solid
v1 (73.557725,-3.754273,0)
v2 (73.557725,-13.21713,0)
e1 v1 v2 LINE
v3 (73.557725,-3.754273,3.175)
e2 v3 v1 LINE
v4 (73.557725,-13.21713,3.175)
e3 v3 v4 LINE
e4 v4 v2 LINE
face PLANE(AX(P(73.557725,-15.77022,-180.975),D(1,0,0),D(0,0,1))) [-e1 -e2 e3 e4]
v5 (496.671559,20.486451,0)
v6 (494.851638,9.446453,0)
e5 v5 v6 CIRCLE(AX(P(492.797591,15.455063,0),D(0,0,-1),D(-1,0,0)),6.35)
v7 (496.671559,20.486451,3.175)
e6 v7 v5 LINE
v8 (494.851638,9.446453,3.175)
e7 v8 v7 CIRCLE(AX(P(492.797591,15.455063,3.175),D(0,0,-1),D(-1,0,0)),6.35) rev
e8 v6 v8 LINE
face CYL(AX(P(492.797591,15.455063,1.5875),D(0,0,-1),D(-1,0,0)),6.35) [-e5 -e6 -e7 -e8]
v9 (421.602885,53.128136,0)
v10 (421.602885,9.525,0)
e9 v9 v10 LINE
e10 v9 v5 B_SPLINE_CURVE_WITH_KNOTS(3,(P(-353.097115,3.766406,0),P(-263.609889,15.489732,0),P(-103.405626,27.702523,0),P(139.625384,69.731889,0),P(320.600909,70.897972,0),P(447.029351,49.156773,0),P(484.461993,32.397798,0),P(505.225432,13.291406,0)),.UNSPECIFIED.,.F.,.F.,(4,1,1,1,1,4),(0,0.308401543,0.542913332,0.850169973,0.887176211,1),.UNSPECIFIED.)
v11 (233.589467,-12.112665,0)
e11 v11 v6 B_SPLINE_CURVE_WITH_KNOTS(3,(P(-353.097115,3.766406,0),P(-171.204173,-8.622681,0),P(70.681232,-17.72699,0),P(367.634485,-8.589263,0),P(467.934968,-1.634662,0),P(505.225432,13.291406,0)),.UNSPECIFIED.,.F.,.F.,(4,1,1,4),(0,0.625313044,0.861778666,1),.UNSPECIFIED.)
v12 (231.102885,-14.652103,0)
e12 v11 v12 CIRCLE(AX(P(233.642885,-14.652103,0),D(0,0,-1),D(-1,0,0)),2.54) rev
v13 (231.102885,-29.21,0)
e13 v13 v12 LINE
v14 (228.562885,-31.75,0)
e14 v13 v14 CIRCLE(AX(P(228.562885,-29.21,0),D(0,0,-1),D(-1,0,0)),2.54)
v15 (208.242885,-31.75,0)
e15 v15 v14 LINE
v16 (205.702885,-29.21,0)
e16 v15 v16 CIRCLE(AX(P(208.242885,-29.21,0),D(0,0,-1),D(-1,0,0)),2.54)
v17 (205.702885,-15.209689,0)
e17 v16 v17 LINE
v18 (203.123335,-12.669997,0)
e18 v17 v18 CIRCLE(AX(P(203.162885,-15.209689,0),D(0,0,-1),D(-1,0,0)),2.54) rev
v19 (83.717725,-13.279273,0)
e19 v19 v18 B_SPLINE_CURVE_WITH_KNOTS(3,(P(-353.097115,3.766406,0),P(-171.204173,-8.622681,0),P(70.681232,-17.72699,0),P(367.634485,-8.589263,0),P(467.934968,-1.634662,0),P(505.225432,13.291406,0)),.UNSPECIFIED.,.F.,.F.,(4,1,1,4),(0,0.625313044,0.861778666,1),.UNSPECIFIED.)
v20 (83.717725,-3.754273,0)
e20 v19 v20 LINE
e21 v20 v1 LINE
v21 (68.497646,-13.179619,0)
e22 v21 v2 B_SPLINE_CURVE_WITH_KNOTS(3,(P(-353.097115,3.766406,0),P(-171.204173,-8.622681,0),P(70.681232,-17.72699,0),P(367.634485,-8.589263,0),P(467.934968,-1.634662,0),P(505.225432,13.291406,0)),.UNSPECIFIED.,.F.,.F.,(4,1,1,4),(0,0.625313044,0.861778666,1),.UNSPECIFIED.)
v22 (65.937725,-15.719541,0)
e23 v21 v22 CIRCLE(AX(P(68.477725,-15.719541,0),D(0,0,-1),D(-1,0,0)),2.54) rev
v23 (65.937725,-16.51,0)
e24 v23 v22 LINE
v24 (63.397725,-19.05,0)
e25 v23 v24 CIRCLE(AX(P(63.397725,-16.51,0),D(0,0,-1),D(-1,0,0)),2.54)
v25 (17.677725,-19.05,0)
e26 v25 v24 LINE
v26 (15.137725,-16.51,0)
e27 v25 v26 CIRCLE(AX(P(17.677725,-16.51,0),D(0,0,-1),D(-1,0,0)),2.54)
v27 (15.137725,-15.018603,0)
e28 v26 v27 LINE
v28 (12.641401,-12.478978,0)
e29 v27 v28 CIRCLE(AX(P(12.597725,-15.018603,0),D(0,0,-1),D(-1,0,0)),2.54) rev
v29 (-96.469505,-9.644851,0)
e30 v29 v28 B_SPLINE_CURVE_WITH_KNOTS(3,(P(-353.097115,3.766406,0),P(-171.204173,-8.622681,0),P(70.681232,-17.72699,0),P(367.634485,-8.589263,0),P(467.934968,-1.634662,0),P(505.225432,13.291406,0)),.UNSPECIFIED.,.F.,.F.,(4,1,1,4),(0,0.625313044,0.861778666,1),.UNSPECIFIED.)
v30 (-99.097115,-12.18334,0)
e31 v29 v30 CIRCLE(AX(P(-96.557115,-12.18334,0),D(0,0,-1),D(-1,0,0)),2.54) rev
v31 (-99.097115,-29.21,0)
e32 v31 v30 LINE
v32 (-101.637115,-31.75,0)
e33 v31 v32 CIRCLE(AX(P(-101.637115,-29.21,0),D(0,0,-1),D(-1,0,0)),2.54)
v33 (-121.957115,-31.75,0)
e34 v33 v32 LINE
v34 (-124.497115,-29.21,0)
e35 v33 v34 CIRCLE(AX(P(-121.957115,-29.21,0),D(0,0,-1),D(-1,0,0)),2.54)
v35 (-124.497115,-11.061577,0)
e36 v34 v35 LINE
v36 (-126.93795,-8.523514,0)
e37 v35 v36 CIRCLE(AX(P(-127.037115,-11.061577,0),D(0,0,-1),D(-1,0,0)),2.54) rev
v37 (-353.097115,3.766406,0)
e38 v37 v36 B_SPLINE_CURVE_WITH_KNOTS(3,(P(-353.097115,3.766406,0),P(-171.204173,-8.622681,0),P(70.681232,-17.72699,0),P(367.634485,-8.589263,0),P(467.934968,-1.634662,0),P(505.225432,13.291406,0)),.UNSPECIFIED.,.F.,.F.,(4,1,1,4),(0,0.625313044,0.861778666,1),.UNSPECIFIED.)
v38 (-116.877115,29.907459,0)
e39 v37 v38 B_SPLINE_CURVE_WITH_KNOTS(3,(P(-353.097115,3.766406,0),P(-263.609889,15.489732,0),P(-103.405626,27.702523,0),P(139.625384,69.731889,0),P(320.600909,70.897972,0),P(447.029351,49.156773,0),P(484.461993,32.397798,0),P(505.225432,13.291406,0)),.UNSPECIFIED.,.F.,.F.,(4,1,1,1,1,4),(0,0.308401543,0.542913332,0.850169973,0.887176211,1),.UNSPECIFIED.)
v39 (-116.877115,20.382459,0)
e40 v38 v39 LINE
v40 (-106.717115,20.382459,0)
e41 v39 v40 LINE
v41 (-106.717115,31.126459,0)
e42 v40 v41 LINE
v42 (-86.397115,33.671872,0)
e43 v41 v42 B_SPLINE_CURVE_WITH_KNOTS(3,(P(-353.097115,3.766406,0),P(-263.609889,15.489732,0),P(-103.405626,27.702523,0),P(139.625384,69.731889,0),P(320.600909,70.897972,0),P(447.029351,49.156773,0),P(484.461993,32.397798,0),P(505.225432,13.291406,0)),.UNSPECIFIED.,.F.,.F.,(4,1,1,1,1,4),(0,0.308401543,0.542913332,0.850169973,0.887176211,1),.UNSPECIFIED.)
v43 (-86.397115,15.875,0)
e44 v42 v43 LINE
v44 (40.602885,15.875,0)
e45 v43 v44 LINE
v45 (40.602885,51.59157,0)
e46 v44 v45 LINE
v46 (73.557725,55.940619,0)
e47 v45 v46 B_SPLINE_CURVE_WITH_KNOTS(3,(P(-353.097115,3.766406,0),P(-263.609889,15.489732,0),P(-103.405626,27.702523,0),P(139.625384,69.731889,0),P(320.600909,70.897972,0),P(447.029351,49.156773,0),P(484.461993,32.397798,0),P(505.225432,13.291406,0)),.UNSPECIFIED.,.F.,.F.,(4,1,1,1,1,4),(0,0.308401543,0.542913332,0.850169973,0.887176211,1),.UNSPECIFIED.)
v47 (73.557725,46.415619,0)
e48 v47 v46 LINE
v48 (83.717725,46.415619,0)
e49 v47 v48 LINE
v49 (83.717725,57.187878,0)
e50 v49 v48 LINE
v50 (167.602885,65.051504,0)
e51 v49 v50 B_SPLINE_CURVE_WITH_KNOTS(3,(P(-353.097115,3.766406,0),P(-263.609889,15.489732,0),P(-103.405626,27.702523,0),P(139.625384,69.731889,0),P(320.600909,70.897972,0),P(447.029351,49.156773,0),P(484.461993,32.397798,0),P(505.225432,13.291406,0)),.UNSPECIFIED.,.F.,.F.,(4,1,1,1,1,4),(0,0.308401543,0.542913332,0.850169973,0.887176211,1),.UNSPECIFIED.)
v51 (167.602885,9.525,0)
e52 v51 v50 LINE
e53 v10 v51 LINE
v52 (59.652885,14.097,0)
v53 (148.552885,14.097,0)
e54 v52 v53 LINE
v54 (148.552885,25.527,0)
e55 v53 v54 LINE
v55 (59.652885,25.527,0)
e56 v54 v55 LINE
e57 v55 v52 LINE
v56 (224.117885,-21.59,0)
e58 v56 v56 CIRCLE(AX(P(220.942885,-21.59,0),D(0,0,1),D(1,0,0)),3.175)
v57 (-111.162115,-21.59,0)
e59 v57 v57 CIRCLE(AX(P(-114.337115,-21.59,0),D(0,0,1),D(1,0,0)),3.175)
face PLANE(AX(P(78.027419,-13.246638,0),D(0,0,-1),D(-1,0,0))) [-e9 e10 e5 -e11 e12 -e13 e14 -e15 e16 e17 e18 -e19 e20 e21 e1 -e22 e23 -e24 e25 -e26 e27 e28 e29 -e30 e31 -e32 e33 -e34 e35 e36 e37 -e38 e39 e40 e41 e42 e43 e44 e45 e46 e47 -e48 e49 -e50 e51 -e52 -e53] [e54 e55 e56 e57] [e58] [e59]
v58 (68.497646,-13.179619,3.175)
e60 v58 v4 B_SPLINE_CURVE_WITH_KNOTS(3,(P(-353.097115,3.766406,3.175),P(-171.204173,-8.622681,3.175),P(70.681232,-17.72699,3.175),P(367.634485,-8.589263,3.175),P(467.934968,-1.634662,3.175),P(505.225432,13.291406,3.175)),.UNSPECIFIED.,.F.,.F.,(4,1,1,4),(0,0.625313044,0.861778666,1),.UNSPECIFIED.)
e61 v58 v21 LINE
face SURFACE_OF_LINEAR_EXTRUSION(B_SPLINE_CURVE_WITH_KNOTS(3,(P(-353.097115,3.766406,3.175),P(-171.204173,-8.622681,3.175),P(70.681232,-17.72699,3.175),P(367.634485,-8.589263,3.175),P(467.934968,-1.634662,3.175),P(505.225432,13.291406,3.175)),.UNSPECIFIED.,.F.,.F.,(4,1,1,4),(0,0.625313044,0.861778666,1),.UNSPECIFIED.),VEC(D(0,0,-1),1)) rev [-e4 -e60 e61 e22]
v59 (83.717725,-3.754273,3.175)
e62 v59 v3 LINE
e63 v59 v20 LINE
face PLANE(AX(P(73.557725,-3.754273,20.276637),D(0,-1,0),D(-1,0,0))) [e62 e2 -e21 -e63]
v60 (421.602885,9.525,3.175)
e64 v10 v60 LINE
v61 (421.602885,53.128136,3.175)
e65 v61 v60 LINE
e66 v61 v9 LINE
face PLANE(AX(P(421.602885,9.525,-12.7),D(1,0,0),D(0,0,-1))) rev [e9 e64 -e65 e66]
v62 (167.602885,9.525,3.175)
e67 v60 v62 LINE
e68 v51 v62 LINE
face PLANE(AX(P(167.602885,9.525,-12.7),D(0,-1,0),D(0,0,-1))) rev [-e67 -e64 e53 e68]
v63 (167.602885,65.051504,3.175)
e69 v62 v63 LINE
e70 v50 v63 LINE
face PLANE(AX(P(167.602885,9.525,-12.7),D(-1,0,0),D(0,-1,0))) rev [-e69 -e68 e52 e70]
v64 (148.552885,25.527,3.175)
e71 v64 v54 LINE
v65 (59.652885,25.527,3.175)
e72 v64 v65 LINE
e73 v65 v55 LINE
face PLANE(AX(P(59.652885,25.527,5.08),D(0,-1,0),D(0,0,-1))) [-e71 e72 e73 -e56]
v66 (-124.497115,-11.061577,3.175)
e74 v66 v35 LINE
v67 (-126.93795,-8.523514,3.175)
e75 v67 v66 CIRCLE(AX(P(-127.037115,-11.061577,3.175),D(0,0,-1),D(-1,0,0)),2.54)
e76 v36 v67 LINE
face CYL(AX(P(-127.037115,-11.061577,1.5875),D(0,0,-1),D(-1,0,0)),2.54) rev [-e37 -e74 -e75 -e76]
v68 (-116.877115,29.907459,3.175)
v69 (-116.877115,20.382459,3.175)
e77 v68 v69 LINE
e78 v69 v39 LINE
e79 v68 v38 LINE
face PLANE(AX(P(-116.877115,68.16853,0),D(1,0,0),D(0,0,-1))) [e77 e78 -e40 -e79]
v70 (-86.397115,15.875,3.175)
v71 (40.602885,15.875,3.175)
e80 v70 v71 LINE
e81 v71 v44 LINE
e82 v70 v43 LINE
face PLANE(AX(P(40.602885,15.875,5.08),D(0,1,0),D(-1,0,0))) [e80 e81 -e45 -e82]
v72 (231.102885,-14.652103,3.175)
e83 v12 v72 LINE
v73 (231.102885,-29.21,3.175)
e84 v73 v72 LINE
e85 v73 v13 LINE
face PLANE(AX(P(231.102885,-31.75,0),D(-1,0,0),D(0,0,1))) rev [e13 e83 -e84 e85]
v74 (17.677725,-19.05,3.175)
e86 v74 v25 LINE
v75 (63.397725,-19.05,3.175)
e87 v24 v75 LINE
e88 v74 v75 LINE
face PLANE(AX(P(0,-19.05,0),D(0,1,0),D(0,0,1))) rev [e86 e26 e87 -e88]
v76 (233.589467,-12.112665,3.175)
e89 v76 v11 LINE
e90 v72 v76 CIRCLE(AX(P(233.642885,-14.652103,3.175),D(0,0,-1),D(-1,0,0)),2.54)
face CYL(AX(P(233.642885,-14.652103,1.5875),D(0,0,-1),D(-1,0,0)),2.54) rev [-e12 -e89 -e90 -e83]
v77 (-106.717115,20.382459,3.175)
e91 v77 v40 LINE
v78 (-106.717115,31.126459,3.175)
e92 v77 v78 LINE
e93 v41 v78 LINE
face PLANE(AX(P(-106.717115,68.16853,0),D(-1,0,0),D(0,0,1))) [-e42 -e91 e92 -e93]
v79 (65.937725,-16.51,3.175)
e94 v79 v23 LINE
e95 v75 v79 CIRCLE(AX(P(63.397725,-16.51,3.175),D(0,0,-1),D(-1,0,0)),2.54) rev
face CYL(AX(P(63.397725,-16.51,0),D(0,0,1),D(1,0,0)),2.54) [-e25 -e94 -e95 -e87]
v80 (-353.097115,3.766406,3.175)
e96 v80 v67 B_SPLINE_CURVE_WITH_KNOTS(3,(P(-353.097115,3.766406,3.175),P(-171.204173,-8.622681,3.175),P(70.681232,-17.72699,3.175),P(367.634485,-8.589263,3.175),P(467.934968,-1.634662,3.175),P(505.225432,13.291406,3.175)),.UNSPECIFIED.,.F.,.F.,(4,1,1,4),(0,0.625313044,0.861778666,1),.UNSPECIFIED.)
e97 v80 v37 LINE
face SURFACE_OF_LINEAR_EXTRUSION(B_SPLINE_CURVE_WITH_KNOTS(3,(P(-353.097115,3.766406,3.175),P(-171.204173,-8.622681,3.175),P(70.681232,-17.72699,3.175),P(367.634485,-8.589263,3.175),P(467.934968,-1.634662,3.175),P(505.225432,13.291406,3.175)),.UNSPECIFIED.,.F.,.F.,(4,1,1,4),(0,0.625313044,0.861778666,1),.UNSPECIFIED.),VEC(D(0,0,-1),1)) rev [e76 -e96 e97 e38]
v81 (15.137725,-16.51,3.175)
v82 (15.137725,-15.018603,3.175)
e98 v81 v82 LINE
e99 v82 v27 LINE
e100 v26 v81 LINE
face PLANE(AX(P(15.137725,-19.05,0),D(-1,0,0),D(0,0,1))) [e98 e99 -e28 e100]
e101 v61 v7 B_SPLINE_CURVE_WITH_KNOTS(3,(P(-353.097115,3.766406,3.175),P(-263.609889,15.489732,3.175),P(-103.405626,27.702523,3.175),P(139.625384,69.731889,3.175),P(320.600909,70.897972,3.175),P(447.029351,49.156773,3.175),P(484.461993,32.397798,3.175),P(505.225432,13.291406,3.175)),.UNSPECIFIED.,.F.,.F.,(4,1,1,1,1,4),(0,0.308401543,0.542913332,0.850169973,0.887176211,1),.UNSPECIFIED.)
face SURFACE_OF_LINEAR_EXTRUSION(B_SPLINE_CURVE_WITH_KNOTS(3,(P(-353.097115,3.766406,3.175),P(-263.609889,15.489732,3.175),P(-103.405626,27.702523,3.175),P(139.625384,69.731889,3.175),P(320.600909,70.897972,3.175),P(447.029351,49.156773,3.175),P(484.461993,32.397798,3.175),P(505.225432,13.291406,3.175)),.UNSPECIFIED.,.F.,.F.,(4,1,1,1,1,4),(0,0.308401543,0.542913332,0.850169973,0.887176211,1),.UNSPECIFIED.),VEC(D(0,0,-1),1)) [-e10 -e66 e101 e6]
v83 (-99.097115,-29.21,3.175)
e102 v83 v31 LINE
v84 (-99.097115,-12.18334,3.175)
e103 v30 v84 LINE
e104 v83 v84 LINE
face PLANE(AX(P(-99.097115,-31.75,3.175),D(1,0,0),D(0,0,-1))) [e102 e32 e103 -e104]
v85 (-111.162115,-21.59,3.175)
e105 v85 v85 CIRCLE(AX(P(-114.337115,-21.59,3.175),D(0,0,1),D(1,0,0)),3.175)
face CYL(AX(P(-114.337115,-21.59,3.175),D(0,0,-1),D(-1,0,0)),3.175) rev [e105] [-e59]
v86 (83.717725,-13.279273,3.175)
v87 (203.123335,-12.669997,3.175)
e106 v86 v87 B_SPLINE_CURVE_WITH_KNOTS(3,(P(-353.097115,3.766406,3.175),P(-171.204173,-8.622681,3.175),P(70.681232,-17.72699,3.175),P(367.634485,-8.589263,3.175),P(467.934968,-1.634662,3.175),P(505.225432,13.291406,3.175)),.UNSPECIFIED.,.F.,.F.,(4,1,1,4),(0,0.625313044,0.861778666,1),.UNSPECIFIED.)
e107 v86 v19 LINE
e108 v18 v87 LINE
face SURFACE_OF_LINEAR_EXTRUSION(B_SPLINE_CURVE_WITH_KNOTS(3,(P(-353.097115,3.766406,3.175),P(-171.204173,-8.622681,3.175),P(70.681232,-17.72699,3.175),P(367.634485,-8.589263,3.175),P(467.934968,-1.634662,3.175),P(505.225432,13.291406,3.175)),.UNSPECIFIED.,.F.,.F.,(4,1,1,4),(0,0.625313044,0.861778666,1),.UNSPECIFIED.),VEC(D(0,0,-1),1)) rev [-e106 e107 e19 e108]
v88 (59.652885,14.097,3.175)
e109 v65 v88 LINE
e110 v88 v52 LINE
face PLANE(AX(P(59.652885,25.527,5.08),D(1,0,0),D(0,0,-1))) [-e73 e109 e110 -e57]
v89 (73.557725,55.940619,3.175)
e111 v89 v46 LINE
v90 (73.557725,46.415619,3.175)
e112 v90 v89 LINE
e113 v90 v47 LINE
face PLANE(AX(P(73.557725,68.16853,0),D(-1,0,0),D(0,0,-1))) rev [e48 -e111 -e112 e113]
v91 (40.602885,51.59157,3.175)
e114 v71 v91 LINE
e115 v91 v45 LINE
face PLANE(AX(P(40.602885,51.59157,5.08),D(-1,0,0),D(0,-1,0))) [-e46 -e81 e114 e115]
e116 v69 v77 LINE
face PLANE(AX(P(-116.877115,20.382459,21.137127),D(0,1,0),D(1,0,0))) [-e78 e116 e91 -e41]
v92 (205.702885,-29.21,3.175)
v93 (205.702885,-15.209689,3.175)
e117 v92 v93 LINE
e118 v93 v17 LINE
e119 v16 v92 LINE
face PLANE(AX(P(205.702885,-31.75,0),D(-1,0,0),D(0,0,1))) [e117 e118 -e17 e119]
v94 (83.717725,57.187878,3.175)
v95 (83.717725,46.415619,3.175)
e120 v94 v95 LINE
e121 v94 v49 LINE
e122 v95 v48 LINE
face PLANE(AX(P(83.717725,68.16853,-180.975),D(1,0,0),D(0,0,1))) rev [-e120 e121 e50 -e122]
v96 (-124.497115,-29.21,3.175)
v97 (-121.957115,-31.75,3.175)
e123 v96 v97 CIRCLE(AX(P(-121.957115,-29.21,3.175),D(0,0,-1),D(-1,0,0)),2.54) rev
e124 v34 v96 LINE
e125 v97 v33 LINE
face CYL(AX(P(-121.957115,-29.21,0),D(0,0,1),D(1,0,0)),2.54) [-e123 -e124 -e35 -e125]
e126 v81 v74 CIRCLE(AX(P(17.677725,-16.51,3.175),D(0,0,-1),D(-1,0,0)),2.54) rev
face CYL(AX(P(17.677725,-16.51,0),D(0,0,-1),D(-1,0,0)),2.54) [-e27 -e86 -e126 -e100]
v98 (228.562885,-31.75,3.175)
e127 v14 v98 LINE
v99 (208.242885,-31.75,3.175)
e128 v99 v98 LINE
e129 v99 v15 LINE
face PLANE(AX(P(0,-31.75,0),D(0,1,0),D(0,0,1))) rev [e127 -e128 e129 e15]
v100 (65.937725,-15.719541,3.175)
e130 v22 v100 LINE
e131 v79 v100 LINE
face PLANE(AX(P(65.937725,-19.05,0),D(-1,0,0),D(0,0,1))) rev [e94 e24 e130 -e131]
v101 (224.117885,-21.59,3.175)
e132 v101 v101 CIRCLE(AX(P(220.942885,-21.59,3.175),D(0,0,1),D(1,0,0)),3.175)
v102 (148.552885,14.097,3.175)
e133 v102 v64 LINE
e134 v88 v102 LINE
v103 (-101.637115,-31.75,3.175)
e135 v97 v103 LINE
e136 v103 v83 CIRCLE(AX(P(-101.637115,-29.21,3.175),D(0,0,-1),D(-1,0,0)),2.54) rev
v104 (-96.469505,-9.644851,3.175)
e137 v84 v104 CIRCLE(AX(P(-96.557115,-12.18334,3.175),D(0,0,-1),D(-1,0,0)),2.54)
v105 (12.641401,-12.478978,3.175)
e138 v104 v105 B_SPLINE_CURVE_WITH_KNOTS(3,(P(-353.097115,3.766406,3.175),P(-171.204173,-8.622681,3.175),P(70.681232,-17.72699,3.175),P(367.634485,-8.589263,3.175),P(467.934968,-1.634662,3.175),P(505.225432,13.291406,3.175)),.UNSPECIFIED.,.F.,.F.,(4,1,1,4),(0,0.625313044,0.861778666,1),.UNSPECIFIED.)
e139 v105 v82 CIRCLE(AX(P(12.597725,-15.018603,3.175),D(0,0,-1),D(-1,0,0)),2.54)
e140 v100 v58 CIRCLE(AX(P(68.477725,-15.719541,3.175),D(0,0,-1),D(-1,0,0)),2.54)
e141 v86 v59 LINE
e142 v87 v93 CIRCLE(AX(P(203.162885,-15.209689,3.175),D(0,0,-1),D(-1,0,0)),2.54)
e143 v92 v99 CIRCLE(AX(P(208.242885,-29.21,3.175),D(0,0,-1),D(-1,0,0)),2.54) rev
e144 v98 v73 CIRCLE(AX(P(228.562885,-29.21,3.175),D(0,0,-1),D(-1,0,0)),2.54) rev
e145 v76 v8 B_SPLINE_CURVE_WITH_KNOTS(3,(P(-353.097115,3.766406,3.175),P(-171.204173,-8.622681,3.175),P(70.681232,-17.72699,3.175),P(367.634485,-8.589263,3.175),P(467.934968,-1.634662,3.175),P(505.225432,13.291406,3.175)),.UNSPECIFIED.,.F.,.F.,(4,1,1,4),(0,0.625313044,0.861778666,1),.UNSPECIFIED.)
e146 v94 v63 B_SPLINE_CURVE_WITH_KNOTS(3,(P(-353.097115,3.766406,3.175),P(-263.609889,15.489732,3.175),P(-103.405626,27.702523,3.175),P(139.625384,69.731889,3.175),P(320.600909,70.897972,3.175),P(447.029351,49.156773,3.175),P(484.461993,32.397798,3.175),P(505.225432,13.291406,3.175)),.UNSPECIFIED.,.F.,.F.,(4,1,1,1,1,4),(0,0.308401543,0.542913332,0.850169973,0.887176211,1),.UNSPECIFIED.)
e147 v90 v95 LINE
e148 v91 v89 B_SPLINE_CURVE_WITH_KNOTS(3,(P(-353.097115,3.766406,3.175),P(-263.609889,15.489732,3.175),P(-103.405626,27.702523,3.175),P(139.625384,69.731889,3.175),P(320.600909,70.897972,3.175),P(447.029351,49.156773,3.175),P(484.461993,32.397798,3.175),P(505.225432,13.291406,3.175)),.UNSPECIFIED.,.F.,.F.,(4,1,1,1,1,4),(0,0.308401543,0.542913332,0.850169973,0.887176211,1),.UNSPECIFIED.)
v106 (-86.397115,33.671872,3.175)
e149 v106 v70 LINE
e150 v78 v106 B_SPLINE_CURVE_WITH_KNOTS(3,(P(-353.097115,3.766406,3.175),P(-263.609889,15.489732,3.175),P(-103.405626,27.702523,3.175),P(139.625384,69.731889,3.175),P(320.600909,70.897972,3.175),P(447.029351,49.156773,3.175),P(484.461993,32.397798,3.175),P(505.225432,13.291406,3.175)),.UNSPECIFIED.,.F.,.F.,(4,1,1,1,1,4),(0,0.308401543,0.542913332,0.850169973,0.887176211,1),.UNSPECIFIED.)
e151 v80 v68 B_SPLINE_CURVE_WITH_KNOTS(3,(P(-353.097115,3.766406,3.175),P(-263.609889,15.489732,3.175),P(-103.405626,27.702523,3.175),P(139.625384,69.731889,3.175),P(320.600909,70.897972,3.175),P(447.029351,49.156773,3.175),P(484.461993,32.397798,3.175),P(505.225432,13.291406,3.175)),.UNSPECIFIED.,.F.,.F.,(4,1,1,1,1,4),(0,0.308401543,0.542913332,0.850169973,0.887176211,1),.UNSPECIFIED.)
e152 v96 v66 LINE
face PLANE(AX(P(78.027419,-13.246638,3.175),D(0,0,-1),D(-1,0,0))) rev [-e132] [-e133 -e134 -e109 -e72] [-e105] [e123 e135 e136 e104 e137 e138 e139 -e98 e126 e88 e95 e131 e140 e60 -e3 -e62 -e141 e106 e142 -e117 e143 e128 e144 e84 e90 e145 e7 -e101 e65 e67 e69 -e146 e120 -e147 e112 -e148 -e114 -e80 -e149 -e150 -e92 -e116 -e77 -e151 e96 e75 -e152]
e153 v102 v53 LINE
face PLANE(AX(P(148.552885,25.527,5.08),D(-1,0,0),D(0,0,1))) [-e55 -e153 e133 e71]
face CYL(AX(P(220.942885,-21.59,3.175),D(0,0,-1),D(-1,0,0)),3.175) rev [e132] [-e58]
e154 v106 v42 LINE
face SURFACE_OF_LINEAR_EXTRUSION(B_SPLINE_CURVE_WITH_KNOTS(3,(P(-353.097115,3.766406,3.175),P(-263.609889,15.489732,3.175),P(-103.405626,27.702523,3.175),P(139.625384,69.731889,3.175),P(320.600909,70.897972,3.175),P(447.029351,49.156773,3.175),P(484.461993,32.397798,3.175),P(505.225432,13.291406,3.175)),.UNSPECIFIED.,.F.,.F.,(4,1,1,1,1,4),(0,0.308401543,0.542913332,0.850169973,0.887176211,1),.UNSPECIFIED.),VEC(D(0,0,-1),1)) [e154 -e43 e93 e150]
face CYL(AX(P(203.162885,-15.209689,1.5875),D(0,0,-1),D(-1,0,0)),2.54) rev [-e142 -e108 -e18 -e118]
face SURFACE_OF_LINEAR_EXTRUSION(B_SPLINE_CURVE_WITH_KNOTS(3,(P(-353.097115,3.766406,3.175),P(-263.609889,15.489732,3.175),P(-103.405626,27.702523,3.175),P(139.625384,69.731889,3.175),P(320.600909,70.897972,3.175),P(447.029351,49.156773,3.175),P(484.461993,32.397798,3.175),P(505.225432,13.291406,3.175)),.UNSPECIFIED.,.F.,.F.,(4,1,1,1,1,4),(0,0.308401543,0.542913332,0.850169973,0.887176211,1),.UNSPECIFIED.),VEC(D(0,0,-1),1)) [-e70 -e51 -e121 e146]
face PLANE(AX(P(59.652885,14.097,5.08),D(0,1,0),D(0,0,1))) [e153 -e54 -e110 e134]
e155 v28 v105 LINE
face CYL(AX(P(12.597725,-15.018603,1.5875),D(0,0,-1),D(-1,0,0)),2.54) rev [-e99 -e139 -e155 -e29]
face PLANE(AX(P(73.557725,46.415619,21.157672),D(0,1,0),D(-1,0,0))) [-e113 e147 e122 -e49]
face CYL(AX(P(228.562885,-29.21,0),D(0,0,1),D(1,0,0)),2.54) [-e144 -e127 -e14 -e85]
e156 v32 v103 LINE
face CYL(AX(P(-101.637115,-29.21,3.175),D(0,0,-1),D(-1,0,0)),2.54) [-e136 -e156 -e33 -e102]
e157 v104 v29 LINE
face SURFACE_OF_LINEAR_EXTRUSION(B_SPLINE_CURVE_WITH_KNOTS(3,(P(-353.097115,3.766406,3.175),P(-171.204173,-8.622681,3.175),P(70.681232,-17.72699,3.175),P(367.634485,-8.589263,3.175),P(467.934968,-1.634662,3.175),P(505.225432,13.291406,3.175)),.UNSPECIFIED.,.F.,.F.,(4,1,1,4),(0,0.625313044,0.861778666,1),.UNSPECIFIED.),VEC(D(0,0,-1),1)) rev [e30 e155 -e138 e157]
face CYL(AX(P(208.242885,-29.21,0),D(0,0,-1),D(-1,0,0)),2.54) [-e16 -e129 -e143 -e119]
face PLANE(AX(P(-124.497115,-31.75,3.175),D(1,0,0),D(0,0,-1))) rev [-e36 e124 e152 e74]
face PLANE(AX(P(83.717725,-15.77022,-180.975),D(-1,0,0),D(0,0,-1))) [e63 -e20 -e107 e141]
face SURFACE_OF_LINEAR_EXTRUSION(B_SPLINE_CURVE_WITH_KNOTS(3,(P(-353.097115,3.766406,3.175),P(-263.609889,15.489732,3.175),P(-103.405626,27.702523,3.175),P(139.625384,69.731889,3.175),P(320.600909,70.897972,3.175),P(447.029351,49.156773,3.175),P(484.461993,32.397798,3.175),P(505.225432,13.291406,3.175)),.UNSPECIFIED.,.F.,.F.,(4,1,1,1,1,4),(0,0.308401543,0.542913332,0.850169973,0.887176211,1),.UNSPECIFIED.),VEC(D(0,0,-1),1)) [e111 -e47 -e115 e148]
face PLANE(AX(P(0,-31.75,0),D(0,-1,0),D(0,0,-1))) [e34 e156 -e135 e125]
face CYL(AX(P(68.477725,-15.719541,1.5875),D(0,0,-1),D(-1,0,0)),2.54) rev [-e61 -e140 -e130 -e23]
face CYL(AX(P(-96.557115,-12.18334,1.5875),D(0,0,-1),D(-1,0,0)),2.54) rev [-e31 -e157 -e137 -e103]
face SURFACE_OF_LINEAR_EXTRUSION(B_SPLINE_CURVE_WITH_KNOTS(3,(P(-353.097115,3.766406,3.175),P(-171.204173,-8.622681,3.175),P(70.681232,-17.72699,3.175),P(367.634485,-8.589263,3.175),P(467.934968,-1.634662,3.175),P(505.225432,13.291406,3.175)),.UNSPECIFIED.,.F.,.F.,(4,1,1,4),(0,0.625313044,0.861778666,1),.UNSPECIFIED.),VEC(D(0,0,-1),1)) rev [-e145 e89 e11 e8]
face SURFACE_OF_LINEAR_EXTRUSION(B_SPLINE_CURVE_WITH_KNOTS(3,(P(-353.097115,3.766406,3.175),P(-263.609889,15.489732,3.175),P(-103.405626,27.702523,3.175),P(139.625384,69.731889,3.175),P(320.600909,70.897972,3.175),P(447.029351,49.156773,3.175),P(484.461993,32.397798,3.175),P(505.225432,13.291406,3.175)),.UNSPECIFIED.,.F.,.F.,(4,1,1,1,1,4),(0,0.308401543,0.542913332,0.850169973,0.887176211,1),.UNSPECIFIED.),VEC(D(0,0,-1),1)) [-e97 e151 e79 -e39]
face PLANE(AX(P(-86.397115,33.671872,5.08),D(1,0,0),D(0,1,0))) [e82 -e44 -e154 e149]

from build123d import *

# Parameters (mm, degrees)
BOSS_EXTRUDE1_DEPTH = 3.175
FILLET1_R           = 6.35
SKETCH6_W           = 88.9
SKETCH6_H           = 11.43
CUT_EXTRUDE3_DEPTH  = 5.08
SKETCH3_W           = 25.4
SKETCH3_H           = 3.175
BOSS_EXTRUDE2_DEPTH = 31.75
SKETCH3_3_W         = 50.8
SKETCH3_3_H         = 3.175
BOSS_EXTRUDE3_DEPTH = 19.05
FILLET2_R           = 2.54
CUT_EXTRUDE2_DEPTH  = 12.7
CUT_EXTRUDE4_DEPTH  = 5.08
SKETCH8_R           = 3.175
CUT_EXTRUDE5_DEPTH  = 504.378680986
CAVITY1_START       = 46.415619464
CAVITY1_OUTLINE_W   = 10.16
CAVITY1_OUTLINE_H   = 3.175
CAVITY1_DEPTH       = 10.772258138
CAVITY1_START_2     = 20.382459347
CAVITY1_2_OUTLINE_W = 10.16
CAVITY1_2_OUTLINE_H = 3.175
CAVITY1_2_DEPTH     = 10.743999494
CAVITY1_START_3     = -13.279272859
CAVITY1_3_OUTLINE_W = 10.16
CAVITY1_3_OUTLINE_H = 3.175
CAVITY1_3_DEPTH     = 9.525


# Read off the part's stored shape, not the designer's step: Cavity1
with BuildPart() as part:
    # Sketch1 → Boss-Extrude1 (new body)
    with BuildSketch(Plane.XY):
        with BuildLine():
            add(Edge.make_bspline(
                [(-353.097115344, 3.76640622), (-263.60988857, 15.489732087), (-103.405625954, 27.702523148), (139.625383809, 69.731889132), (320.600909148, 70.897971745), (447.029350736, 49.156772515), (484.461992977, 32.39779841), (505.225432444, 13.29140622)],
                knots=[0, 0, 0, 0, 0.308401543, 0.542913332, 0.850169973, 0.887176211, 1, 1, 1, 1], degree=3))
            add(Edge.make_bspline(
                [(-353.097115344, 3.76640622), (-171.204173065, -8.622681299), (70.681231732, -17.726989966), (367.634485174, -8.589262826), (467.934967897, -1.634661846), (505.225432444, 13.29140622)],
                knots=[0, 0, 0, 0, 0.625313044, 0.861778666, 1, 1, 1, 1], degree=3))
        make_face()
    extrude(amount=BOSS_EXTRUDE1_DEPTH)

    # Fillet1
    fillet1_edges = [part.edges().sort_by_distance(p)[0] for p in [
        (505.225432444, 13.29140622, 1.5875),
    ]]
    fillet(fillet1_edges, radius=FILLET1_R)

    # Sketch6 → Cut-Extrude3 (cut)
    with BuildSketch(Plane.XY):
        with Locations((104.102884656, 19.812)):
            Rectangle(SKETCH6_W, SKETCH6_H)
    extrude(amount=CUT_EXTRUDE3_DEPTH, mode=Mode.SUBTRACT)

    # Sketch3 → Boss-Extrude2 (add)
    with BuildSketch(Plane(origin=(0, 0, 0), x_dir=(1, 0, 0), z_dir=(0, 1, 0))):
        with Locations((-111.797115344, -1.5875)):
            Rectangle(SKETCH3_W, SKETCH3_H)
        with Locations((218.402884656, -1.5875)):
            Rectangle(SKETCH3_W, SKETCH3_H)
    extrude(amount=-BOSS_EXTRUDE2_DEPTH)

    # Sketch3<3> → Boss-Extrude3 (add)
    with BuildSketch(Plane(origin=(0, 0, 0), x_dir=(1, 0, 0), z_dir=(0, 1, 0))):
        with Locations((40.53772502, -1.5875)):
            Rectangle(SKETCH3_3_W, SKETCH3_3_H)
    extrude(amount=-BOSS_EXTRUDE3_DEPTH)

    # Fillet2
    fillet2_edges = [part.edges().sort_by_distance(p)[0] for p in [
        (-124.497115344, -8.618440951, 1.5875),
        (-99.097115344, -9.553641032, 1.5875),
        (205.702884656, -12.629236372, 1.5875),
        (231.102884656, -12.164410009, 1.5875),
        (15.13772502, -12.521395898, 1.5875),
        (65.93772502, -13.158984983, 1.5875),
        (-124.497115344, -31.75, 1.5875),
        (-99.097115344, -31.75, 1.5875),
        (15.13772502, -19.05, 1.5875),
        (65.93772502, -19.05, 1.5875),
        (205.702884656, -31.75, 1.5875),
        (231.102884656, -31.75, 1.5875),
    ]]
    fillet(fillet2_edges, radius=FILLET2_R)

    # Sketch5 → Cut-Extrude2 (cut, symmetric)
    with BuildSketch(Plane.XY):
        with BuildLine():
            Line((167.602884656, 9.525), (421.602884656, 9.525))
            Line((421.602884656, 9.525), (421.602884656, 53.128136288))
            add(Edge.make_bspline(
                [(167.602884656, 65.051503813), (244.722722107, 70.03272949), (333.181087562, 68.488590043), (412.953469478, 55.01226242), (421.602884656, 53.128136288)],
                knots=[0.603089435, 0.603089435, 0.603089435, 0.603089435, 0.862957728, 0.895261032, 0.895261032, 0.895261032, 0.895261032], degree=3))
            Line((167.602884656, 65.051503813), (167.602884656, 9.525))
        make_face()
    extrude(amount=CUT_EXTRUDE2_DEPTH, both=True, mode=Mode.SUBTRACT)

    # Sketch7 → Cut-Extrude4 (cut)
    with BuildSketch(Plane.XY):
        with BuildLine():
            Line((40.602884656, 51.591569772), (40.602884656, 15.875))
            Line((40.602884656, 15.875), (-86.397115344, 15.875))
            Line((-86.397115344, 15.875), (-86.397115344, 33.671872302))
            add(Edge.make_bspline(
                [(-86.397115344, 33.671872302), (-85.336997309, 33.80875443), (-42.923565209, 39.312219047), (-0.873657075, 45.877823306), (40.602884656, 51.591569772)],
                knots=[0.304745552, 0.304745552, 0.304745552, 0.304745552, 0.308401543, 0.451045815, 0.451045815, 0.451045815, 0.451045815], degree=3))
        make_face()
    extrude(amount=CUT_EXTRUDE4_DEPTH, mode=Mode.SUBTRACT)

    # Sketch8 → Cut-Extrude5 (cut, through all)
    with BuildSketch(Plane.XY):
        with Locations((220.942884656, -21.59)):
            Circle(SKETCH8_R)
        with Locations((-114.337115344, -21.59)):
            Circle(SKETCH8_R)
    extrude(amount=CUT_EXTRUDE5_DEPTH, mode=Mode.SUBTRACT)

    # Cavity1 outline → Cavity1 (cut)
    with BuildSketch(Plane(origin=(0, 0, 0), x_dir=(1, 0, 0), z_dir=(0, 1, 0)).offset(CAVITY1_START)):
        with Locations((78.637724966, -1.5875)):
            Rectangle(CAVITY1_OUTLINE_W, CAVITY1_OUTLINE_H)
    extrude(amount=CAVITY1_DEPTH, mode=Mode.SUBTRACT)

    # Cavity1 2 outline → Cavity1 2 (cut)
    with BuildSketch(Plane(origin=(0, 0, 0), x_dir=(1, 0, 0), z_dir=(0, 1, 0)).offset(CAVITY1_START_2)):
        with Locations((-111.797115344, -1.5875)):
            Rectangle(CAVITY1_2_OUTLINE_W, CAVITY1_2_OUTLINE_H)
    extrude(amount=CAVITY1_2_DEPTH, mode=Mode.SUBTRACT)

    # Cavity1 3 outline → Cavity1 3 (cut)
    with BuildSketch(Plane(origin=(0, 0, 0), x_dir=(1, 0, 0), z_dir=(0, 1, 0)).offset(CAVITY1_START_3)):
        with Locations((78.637724966, -1.5875)):
            Rectangle(CAVITY1_3_OUTLINE_W, CAVITY1_3_OUTLINE_H)
    extrude(amount=CAVITY1_3_DEPTH, mode=Mode.SUBTRACT)


solid = part.part
